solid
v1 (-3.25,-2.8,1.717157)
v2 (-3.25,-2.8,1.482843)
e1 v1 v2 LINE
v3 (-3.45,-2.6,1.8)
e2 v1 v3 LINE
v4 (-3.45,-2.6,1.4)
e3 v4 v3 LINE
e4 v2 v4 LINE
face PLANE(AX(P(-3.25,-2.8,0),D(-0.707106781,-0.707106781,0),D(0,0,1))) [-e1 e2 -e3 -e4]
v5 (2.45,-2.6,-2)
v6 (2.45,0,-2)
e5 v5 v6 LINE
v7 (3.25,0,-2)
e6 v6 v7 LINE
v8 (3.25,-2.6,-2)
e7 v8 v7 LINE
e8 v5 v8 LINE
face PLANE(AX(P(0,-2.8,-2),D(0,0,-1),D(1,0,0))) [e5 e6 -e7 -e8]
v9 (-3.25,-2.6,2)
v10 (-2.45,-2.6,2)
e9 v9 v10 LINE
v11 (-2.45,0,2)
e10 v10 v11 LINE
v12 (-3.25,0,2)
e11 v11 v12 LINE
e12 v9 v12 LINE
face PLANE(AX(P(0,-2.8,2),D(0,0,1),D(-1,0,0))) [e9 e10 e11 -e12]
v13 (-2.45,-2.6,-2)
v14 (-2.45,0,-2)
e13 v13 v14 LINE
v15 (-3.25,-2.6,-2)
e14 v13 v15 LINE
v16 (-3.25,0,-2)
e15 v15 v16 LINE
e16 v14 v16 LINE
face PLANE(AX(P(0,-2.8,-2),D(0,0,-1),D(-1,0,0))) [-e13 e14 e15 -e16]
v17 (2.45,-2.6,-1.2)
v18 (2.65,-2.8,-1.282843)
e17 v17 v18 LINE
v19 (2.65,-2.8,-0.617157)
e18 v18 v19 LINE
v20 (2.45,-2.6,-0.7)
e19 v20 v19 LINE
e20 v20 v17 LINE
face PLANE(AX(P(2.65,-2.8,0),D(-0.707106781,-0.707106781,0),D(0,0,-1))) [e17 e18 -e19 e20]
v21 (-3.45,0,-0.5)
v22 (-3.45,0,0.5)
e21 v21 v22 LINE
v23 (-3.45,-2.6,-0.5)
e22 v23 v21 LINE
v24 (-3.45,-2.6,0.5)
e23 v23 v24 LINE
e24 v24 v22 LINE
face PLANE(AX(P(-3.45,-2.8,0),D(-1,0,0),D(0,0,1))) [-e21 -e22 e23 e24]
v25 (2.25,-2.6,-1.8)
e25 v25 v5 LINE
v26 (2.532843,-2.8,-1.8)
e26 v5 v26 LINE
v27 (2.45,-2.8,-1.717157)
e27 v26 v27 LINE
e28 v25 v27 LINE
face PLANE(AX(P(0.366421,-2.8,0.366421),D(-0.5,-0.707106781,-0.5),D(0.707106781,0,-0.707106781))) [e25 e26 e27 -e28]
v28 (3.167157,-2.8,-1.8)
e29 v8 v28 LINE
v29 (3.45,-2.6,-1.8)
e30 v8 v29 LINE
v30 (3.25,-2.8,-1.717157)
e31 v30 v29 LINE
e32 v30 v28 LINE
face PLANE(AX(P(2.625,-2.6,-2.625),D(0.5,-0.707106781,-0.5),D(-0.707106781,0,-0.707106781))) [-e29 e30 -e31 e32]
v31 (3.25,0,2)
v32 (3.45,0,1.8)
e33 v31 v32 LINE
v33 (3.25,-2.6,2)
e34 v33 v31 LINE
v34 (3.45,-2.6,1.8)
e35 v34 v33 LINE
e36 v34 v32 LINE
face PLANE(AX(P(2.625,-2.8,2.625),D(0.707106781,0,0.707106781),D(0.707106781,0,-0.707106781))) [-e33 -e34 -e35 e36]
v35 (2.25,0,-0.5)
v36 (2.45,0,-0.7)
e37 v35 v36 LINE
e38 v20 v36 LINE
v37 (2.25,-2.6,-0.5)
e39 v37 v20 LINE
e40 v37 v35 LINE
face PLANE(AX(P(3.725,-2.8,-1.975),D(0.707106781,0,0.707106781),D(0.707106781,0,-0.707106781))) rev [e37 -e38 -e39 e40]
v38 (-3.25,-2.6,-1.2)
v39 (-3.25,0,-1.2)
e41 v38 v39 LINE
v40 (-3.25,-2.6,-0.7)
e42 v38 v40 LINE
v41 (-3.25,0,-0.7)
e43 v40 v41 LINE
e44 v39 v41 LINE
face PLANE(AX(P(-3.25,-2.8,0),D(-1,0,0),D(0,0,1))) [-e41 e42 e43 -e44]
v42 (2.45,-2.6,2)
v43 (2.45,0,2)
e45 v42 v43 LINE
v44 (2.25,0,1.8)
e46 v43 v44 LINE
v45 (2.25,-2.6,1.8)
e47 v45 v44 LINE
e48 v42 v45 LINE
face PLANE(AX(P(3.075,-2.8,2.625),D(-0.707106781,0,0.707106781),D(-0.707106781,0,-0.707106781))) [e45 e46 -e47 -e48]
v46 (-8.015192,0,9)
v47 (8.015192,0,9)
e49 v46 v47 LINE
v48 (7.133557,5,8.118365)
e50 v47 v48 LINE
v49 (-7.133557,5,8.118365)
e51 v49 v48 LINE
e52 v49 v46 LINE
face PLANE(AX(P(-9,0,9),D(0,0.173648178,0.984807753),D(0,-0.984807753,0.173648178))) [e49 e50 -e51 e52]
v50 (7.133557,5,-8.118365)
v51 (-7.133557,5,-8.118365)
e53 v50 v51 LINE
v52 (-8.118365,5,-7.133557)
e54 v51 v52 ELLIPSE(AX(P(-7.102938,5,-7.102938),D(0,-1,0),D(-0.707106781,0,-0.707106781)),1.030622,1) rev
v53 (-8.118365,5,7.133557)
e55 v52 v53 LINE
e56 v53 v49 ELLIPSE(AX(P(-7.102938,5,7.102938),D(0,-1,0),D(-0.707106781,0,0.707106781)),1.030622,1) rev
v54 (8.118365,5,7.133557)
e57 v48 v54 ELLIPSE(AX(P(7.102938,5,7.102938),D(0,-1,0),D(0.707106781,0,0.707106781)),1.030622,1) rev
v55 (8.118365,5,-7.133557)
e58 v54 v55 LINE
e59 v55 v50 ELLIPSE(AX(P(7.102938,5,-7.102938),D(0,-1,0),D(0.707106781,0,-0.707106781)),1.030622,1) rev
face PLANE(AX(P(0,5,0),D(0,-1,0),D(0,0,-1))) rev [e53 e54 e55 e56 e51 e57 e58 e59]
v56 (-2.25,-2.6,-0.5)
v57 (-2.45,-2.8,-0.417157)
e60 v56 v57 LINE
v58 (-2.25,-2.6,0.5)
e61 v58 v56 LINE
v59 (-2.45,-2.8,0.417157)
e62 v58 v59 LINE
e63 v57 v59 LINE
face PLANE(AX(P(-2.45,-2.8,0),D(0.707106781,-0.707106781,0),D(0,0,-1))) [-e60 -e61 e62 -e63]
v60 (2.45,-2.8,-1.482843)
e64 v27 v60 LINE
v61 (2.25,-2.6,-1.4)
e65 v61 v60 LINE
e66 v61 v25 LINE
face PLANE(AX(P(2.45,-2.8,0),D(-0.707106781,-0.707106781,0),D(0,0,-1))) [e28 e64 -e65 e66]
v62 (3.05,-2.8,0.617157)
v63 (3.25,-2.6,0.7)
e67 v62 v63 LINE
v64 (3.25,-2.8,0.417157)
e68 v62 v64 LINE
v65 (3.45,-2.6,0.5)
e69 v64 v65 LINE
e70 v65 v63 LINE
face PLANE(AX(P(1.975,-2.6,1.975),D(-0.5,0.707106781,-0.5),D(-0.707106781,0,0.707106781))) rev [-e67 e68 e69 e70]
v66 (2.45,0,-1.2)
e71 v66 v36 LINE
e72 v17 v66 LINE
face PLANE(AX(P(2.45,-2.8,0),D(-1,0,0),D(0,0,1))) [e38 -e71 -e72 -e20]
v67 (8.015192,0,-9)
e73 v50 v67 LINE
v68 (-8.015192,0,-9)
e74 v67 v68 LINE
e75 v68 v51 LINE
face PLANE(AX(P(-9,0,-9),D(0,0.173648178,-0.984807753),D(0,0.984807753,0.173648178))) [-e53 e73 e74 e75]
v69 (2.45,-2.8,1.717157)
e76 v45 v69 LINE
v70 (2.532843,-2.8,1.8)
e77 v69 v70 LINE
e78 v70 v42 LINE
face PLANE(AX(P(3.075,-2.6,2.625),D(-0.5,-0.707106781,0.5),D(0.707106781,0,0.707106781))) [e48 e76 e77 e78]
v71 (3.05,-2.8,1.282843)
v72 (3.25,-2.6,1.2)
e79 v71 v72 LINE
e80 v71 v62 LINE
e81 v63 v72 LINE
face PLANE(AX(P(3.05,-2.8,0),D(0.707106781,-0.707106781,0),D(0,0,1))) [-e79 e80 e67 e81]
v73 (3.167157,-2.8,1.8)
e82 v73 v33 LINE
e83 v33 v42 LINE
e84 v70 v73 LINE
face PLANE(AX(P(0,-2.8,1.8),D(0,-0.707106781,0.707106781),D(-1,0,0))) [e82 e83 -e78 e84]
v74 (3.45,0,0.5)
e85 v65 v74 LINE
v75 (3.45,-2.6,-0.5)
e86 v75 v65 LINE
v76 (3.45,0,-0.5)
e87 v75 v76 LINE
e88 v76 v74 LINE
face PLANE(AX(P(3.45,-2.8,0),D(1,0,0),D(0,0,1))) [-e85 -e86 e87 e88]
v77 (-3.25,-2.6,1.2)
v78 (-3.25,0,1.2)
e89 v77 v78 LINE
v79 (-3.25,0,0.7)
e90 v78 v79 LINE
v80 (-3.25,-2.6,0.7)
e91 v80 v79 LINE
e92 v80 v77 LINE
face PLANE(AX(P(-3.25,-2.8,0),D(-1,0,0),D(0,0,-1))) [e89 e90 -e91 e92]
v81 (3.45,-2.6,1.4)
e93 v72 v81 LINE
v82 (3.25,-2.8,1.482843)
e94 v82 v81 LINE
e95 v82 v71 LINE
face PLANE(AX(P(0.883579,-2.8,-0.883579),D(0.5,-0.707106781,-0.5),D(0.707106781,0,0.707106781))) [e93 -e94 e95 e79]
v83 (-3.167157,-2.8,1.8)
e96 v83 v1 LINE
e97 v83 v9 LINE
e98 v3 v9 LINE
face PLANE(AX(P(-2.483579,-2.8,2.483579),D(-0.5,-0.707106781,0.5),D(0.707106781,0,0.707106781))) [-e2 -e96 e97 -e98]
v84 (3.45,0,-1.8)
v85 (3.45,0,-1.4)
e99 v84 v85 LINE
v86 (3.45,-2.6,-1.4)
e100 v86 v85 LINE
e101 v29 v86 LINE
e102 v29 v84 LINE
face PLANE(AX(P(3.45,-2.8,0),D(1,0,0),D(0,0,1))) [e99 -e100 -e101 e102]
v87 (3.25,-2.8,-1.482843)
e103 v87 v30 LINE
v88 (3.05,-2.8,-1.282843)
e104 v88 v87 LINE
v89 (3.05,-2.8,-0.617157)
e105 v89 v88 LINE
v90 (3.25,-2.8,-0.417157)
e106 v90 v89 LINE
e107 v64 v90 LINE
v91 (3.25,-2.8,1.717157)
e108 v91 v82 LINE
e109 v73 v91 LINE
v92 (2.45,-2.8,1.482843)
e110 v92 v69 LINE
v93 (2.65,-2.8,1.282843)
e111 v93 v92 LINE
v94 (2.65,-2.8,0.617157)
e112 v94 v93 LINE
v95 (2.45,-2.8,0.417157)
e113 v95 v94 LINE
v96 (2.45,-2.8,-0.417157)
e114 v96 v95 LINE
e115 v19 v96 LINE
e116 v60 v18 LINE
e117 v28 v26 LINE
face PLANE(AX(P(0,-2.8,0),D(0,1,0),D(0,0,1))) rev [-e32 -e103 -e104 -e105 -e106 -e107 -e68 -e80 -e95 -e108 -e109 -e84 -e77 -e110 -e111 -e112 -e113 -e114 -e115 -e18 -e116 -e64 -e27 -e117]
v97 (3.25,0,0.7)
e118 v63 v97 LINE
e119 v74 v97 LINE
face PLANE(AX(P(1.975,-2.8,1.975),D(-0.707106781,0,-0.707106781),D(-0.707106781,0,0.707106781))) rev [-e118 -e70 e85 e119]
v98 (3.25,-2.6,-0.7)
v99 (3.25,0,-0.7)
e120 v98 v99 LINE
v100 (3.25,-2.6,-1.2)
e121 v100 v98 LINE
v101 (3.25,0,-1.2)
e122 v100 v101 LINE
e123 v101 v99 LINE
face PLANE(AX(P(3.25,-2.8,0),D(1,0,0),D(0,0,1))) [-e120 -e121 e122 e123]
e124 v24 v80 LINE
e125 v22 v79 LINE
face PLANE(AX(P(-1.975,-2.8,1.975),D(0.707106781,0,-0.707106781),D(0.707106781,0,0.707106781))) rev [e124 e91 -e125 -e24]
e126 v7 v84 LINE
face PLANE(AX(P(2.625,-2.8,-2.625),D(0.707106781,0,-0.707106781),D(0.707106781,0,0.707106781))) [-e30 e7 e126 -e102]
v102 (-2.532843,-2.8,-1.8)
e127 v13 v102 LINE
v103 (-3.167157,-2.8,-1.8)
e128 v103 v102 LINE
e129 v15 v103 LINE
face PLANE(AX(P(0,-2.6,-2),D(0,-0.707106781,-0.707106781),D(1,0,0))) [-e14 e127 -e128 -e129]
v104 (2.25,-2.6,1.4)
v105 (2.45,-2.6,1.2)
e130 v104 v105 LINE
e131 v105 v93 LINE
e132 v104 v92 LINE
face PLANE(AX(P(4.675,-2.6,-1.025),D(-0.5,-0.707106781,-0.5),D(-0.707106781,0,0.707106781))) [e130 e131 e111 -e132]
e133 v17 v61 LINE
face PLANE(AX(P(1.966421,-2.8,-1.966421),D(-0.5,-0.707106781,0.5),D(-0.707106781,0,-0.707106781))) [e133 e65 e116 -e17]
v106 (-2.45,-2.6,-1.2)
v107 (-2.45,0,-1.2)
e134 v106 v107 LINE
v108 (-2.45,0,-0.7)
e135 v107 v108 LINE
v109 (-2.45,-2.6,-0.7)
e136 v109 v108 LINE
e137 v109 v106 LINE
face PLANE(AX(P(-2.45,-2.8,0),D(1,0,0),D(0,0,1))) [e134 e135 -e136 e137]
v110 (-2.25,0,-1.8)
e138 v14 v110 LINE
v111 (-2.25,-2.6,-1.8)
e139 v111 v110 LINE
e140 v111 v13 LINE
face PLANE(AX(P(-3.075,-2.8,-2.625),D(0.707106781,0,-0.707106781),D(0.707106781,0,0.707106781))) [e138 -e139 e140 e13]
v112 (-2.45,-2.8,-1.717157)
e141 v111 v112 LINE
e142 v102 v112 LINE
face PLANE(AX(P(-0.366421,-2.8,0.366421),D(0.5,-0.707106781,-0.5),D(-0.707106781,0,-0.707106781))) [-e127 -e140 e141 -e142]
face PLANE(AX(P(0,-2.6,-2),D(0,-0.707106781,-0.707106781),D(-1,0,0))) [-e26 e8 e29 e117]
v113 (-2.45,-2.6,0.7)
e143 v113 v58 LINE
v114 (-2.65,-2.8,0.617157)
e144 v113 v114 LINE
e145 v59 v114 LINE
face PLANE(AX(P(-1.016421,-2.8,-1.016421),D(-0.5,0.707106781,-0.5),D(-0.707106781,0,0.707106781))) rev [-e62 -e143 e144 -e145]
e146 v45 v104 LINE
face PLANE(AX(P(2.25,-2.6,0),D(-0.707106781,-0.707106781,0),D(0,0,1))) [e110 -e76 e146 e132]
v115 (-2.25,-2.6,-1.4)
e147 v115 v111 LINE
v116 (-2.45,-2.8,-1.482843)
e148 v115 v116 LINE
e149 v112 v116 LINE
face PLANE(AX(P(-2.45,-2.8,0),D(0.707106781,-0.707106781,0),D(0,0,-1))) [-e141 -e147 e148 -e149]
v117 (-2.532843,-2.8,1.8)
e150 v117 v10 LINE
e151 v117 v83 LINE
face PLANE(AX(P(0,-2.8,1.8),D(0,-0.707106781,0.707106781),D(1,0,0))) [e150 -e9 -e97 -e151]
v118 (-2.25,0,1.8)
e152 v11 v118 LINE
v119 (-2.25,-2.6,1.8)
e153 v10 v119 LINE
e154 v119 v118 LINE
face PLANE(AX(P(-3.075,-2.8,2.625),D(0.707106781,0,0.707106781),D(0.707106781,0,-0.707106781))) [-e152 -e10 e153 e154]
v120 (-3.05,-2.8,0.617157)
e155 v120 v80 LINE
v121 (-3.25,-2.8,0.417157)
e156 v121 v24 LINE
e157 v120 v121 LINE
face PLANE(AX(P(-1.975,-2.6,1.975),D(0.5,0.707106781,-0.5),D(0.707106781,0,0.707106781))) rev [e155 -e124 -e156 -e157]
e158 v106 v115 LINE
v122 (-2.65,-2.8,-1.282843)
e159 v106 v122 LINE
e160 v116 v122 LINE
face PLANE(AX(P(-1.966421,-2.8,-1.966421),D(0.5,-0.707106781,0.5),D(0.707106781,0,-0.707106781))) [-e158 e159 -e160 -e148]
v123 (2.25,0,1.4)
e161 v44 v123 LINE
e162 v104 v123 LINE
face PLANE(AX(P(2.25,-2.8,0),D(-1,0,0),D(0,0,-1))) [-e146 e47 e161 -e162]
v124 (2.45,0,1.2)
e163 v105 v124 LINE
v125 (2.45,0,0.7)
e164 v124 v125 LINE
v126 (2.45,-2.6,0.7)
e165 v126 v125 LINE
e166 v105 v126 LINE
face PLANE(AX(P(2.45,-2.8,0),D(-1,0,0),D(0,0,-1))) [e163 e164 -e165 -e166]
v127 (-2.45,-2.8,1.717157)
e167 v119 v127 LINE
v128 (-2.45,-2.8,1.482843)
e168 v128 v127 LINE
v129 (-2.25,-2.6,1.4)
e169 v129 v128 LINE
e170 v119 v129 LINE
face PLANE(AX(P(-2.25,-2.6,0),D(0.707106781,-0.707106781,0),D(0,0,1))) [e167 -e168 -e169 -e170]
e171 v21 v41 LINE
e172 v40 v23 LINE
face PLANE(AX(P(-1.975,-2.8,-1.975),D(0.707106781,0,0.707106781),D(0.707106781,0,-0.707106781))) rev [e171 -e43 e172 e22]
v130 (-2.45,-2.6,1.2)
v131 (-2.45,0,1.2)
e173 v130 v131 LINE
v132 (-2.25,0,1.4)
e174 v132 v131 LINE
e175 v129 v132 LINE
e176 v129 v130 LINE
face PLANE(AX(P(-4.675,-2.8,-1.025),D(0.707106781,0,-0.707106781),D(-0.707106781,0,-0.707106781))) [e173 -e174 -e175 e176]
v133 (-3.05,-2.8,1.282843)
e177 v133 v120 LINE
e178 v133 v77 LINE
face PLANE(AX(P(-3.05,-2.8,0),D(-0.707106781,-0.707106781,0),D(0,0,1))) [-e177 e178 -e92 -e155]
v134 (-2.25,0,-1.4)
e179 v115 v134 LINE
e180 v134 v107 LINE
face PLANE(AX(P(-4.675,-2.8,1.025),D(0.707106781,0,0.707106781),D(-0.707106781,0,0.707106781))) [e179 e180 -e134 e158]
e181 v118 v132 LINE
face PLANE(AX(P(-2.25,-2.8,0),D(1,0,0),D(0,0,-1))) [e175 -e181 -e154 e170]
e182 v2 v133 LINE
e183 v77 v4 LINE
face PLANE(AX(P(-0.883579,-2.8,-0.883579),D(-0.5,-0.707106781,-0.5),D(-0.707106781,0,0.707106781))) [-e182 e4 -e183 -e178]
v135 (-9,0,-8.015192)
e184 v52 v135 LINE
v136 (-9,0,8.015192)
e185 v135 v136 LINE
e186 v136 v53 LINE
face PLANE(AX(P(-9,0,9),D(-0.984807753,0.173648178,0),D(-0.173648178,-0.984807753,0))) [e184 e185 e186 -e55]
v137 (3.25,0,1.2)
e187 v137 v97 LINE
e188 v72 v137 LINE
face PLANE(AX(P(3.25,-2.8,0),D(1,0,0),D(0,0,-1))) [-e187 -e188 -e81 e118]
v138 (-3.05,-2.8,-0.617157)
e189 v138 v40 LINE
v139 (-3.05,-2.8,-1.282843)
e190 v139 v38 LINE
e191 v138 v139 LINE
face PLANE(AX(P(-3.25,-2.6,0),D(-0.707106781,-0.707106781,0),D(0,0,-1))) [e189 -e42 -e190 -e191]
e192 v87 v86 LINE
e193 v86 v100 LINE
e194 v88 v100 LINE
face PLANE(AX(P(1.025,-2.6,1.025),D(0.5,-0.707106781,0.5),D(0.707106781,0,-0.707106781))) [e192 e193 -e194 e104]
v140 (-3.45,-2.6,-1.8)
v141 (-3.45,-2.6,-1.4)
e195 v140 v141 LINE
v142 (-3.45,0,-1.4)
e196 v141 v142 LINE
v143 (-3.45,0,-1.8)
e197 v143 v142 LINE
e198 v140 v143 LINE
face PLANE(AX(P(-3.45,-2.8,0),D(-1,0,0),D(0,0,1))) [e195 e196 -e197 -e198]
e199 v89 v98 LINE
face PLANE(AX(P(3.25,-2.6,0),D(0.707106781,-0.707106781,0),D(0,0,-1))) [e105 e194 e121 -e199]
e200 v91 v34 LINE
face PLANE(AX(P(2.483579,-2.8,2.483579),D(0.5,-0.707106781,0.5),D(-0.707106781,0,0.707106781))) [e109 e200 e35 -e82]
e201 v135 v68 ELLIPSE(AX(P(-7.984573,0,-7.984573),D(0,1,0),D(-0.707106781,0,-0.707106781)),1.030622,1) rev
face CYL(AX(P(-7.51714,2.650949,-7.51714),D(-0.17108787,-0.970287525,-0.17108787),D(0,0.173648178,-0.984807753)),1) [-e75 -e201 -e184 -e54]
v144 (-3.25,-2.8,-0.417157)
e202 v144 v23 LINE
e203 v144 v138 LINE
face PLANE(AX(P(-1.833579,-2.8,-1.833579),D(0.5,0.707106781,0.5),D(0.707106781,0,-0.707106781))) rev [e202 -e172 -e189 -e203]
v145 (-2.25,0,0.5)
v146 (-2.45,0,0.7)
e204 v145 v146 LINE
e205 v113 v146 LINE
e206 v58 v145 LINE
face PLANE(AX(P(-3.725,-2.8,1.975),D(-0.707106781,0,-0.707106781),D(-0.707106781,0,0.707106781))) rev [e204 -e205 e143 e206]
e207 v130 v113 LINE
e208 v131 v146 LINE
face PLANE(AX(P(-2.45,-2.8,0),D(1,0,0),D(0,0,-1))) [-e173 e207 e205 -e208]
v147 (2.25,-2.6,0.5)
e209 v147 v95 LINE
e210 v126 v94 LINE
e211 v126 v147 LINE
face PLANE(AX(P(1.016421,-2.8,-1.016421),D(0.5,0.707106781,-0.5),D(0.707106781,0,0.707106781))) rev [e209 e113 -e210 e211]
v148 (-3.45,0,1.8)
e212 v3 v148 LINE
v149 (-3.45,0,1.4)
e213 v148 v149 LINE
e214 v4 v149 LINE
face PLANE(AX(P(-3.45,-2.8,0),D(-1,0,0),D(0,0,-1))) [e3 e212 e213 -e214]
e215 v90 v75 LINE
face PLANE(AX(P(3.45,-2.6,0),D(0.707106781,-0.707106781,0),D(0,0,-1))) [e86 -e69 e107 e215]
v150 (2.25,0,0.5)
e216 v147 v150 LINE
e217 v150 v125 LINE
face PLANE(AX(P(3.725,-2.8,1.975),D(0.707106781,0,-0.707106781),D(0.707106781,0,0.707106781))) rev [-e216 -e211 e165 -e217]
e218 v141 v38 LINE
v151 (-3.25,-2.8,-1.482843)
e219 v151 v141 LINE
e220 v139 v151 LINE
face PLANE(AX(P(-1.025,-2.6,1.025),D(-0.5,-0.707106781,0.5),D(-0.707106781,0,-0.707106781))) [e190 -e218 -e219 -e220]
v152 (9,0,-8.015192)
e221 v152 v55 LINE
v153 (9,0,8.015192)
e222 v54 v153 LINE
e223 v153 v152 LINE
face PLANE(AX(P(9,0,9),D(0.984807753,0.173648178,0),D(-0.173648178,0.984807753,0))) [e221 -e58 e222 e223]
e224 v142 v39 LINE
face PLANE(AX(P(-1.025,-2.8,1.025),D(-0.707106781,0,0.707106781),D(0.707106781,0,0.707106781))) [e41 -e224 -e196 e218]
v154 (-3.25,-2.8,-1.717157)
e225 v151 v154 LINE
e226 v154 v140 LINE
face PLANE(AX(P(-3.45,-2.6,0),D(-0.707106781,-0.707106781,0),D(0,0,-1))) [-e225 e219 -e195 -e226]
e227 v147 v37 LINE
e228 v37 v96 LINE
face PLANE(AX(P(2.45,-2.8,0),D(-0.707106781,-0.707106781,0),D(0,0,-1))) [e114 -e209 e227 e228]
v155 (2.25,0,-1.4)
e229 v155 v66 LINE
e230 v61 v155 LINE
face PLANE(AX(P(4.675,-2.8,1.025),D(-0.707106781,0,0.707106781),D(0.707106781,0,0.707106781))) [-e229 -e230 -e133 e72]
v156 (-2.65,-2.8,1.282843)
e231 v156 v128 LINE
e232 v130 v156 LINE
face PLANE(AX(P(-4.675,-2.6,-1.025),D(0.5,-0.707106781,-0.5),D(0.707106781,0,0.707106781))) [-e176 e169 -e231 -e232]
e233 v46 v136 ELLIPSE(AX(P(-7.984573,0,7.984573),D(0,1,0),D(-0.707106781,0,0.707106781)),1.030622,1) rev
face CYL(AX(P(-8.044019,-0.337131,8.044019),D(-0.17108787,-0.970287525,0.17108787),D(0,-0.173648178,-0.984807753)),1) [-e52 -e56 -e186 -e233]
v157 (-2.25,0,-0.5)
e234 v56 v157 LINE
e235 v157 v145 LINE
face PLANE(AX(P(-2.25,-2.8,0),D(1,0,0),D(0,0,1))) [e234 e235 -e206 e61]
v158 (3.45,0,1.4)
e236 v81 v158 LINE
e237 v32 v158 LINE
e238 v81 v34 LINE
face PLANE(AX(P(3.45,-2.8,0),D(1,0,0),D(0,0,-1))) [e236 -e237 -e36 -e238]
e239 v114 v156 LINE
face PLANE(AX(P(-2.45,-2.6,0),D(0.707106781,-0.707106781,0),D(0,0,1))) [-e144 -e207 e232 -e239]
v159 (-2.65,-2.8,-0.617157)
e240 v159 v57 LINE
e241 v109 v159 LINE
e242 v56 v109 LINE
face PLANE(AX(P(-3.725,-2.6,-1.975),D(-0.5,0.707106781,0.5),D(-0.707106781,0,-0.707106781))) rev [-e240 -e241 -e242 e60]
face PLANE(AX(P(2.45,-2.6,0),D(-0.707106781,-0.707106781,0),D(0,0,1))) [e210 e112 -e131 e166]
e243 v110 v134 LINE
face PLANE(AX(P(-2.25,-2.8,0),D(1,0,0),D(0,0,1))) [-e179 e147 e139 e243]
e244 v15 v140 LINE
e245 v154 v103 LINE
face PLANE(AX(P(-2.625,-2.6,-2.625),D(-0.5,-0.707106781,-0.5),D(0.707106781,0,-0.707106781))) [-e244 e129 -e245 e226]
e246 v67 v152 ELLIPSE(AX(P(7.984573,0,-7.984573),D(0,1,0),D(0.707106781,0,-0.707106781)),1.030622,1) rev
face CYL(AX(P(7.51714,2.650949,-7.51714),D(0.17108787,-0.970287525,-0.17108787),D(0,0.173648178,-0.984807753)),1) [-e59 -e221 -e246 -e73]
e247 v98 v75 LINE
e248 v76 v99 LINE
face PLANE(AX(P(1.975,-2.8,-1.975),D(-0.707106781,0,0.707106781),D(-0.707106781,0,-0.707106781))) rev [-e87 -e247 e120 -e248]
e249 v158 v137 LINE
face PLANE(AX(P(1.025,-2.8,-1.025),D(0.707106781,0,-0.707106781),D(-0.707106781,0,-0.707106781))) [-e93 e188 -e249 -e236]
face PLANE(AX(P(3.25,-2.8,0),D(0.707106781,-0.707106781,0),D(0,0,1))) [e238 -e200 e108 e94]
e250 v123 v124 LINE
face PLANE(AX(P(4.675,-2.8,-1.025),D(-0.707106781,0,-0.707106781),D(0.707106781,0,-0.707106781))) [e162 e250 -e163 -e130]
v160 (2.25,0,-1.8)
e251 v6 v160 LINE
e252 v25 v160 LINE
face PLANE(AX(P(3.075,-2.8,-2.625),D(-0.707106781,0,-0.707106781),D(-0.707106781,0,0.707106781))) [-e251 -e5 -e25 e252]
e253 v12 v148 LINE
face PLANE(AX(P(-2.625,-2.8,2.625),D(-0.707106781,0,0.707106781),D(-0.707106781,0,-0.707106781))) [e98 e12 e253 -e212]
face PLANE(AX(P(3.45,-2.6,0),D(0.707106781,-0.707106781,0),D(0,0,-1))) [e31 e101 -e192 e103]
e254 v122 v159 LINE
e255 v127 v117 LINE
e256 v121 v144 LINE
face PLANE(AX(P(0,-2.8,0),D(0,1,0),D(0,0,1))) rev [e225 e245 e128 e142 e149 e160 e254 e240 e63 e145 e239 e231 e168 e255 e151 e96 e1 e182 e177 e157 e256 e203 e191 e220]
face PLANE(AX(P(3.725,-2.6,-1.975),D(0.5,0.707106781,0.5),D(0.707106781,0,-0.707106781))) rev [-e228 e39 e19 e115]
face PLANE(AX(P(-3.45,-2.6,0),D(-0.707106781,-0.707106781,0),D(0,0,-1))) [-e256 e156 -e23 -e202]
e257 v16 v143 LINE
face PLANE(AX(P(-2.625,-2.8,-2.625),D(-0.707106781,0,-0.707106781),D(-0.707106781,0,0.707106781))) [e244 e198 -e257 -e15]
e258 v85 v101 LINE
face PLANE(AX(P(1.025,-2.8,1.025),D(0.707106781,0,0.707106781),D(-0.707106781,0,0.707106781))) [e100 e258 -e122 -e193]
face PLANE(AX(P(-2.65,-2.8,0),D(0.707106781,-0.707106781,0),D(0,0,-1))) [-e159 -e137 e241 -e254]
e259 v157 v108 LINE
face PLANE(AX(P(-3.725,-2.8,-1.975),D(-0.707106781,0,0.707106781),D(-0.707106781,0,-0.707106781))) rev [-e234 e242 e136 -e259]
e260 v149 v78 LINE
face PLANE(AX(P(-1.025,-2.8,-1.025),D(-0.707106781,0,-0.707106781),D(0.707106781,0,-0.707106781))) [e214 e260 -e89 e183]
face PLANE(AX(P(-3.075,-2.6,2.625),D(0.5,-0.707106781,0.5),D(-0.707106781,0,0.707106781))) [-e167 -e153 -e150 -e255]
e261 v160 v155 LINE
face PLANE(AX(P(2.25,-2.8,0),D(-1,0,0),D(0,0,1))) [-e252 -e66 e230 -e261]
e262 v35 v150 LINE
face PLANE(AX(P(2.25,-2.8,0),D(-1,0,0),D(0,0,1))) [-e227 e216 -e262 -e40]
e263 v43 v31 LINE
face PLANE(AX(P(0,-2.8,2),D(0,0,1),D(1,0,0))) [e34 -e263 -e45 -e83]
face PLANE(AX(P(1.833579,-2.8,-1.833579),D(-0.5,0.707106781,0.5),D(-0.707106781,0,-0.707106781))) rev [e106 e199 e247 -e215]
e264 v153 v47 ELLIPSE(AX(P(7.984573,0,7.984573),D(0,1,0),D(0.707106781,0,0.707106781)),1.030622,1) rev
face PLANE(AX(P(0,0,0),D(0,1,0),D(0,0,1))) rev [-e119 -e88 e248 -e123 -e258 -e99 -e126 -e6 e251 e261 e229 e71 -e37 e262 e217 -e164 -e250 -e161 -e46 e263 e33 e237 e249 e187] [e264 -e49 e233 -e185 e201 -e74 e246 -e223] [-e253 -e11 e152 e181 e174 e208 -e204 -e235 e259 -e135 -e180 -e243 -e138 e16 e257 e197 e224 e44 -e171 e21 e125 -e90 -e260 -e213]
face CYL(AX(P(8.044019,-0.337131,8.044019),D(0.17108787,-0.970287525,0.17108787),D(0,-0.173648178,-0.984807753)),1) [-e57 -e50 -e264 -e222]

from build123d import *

# Parameters (mm, degrees)
BOSS_EXTRUDE1_DEPTH = 2.8
MIRROR1_START       = -2.8
MIRROR1_DEPTH       = 2.8
CHAMFER2_SIZE       = 0.2
BOSS_EXTRUDE2_DEPTH = 1
SKETCH2_W           = 18
SKETCH2_H           = 18
BOSS_EXTRUDE3_DEPTH = 5
BOSS_EXTRUDE3_TAPER = 10
FILLET1_R           = 1


# Read off the part's stored shape, not the designer's step: Mirror1
with BuildPart() as part:
    # Sketch1 → Boss-Extrude1 (new body)
    with BuildSketch(Plane(origin=(0, 0, 0), x_dir=(1, 0, 0), z_dir=(0, 1, 0))):
        Polygon((-2.85, 0), (-3.45, 0), (-3.45, 0.5), (-3.25, 0.7), (-3.25, 1.2), (-3.45, 1.4), (-3.45, 1.8), (-3.25, 2), (-2.85, 2), align=None)
    extrude(amount=-BOSS_EXTRUDE1_DEPTH)

    # Mirror1 outline → Mirror1 (add)
    with BuildSketch(Plane(origin=(0, 0, 0), x_dir=(1, 0, 0), z_dir=(0, 1, 0)).offset(MIRROR1_START)):
        Polygon((-2.85, 0), (-3.45, 0), (-3.45, -0.5), (-3.25, -0.7), (-3.25, -1.2), (-3.45, -1.4), (-3.45, -1.8), (-3.25, -2), (-2.45, -2), (-2.25, -1.8), (-2.25, -1.4), (-2.45, -1.2), (-2.45, -0.7), (-2.25, -0.5), (-2.25, 0.5), (-2.45, 0.7), (-2.45, 1.2), (-2.25, 1.4), (-2.25, 1.8), (-2.45, 2), (-2.85, 2), align=None)
    extrude(amount=MIRROR1_DEPTH)

    # Chamfer2
    chamfer2_edges = [part.edges().sort_by_distance(p)[0] for p in [
        (-2.85, -2.8, -2),
        (-3.35, -2.8, -1.9),
        (-3.45, -2.8, -1.6),
        (-3.35, -2.8, -1.3),
        (-3.25, -2.8, -0.95),
        (-2.35, -2.8, -0.6),
        (-2.25, -2.8, 0),
        (-2.35, -2.8, 0.6),
        (-2.85, -2.8, 2),
        (-3.35, -2.8, 1.9),
        (-3.45, -2.8, 1.6),
        (-3.35, -2.8, 1.3),
        (-3.25, -2.8, 0.95),
        (-2.35, -2.8, -1.9),
        (-2.25, -2.8, -1.6),
        (-2.35, -2.8, -1.3),
        (-2.45, -2.8, -0.95),
        (-3.35, -2.8, 0.6),
        (-3.35, -2.8, -0.6),
        (-2.45, -2.8, 0.95),
        (-2.35, -2.8, 1.3),
        (-2.25, -2.8, 1.6),
        (-2.35, -2.8, 1.9),
        (-3.45, -2.8, 0),
    ]]
    chamfer(chamfer2_edges, length=CHAMFER2_SIZE)


with BuildPart() as body_2:
    # Mirror5: mirrored copy
    add(part.part.mirror(Plane(origin=(0, 0, 0), x_dir=(0, 0, 1), z_dir=(1, 0, 0))))


with BuildPart() as part_1:
    add(part.part)

    add(body_2.part)  # Boss-Extrude2 merges body 2
    # Sketch1<4> → Boss-Extrude2 (add)
    # profile 1 of 2: a face of its own
    with BuildSketch(Plane(origin=(0, 0, 0), x_dir=(1, 0, 0), z_dir=(0, 1, 0))):
        Polygon((-5, 1.7), (-4.6, 2.1), (4.6, 2.1), (5, 1.7), (5, -1.7), (4.6, -2.1), (-4.6, -2.1), (-5, -1.7), align=None)
        Polygon((-2.85, 2), (-2.85, 0), (-3.45, 0), (-3.45, 0.5), (-3.25, 0.7), (-3.25, 1.2), (-3.45, 1.4), (-3.45, 1.8), (-3.25, 2), align=None, mode=Mode.SUBTRACT)
    # profile 2 of 2: a face of its own
    with BuildSketch(Plane(origin=(0, 0, 0), x_dir=(1, 0, 0), z_dir=(0, 1, 0))):
        Polygon((-2.85, 0), (-3.45, 0), (-3.45, 0.5), (-3.25, 0.7), (-3.25, 1.2), (-3.45, 1.4), (-3.45, 1.8), (-3.25, 2), (-2.85, 2), align=None)
    extrude(amount=BOSS_EXTRUDE2_DEPTH)

    # Sketch2 → Boss-Extrude3 (add)
    with BuildSketch(Plane(origin=(0, 0, 0), x_dir=(1, 0, 0), z_dir=(0, 1, 0))):
        Rectangle(SKETCH2_W, SKETCH2_H)
    extrude(amount=BOSS_EXTRUDE3_DEPTH, taper=BOSS_EXTRUDE3_TAPER)

    # Fillet1
    fillet1_edges = [part_1.edges().sort_by_distance(p)[0] for p in [
        (8.559182548, 2.5, 8.559182548),
        (8.559182548, 2.5, -8.559182548),
        (-8.559182548, 2.5, -8.559182548),
        (-8.559182548, 2.5, 8.559182548),
    ]]
    fillet(fillet1_edges, radius=FILLET1_R)


solid = part_1.part
